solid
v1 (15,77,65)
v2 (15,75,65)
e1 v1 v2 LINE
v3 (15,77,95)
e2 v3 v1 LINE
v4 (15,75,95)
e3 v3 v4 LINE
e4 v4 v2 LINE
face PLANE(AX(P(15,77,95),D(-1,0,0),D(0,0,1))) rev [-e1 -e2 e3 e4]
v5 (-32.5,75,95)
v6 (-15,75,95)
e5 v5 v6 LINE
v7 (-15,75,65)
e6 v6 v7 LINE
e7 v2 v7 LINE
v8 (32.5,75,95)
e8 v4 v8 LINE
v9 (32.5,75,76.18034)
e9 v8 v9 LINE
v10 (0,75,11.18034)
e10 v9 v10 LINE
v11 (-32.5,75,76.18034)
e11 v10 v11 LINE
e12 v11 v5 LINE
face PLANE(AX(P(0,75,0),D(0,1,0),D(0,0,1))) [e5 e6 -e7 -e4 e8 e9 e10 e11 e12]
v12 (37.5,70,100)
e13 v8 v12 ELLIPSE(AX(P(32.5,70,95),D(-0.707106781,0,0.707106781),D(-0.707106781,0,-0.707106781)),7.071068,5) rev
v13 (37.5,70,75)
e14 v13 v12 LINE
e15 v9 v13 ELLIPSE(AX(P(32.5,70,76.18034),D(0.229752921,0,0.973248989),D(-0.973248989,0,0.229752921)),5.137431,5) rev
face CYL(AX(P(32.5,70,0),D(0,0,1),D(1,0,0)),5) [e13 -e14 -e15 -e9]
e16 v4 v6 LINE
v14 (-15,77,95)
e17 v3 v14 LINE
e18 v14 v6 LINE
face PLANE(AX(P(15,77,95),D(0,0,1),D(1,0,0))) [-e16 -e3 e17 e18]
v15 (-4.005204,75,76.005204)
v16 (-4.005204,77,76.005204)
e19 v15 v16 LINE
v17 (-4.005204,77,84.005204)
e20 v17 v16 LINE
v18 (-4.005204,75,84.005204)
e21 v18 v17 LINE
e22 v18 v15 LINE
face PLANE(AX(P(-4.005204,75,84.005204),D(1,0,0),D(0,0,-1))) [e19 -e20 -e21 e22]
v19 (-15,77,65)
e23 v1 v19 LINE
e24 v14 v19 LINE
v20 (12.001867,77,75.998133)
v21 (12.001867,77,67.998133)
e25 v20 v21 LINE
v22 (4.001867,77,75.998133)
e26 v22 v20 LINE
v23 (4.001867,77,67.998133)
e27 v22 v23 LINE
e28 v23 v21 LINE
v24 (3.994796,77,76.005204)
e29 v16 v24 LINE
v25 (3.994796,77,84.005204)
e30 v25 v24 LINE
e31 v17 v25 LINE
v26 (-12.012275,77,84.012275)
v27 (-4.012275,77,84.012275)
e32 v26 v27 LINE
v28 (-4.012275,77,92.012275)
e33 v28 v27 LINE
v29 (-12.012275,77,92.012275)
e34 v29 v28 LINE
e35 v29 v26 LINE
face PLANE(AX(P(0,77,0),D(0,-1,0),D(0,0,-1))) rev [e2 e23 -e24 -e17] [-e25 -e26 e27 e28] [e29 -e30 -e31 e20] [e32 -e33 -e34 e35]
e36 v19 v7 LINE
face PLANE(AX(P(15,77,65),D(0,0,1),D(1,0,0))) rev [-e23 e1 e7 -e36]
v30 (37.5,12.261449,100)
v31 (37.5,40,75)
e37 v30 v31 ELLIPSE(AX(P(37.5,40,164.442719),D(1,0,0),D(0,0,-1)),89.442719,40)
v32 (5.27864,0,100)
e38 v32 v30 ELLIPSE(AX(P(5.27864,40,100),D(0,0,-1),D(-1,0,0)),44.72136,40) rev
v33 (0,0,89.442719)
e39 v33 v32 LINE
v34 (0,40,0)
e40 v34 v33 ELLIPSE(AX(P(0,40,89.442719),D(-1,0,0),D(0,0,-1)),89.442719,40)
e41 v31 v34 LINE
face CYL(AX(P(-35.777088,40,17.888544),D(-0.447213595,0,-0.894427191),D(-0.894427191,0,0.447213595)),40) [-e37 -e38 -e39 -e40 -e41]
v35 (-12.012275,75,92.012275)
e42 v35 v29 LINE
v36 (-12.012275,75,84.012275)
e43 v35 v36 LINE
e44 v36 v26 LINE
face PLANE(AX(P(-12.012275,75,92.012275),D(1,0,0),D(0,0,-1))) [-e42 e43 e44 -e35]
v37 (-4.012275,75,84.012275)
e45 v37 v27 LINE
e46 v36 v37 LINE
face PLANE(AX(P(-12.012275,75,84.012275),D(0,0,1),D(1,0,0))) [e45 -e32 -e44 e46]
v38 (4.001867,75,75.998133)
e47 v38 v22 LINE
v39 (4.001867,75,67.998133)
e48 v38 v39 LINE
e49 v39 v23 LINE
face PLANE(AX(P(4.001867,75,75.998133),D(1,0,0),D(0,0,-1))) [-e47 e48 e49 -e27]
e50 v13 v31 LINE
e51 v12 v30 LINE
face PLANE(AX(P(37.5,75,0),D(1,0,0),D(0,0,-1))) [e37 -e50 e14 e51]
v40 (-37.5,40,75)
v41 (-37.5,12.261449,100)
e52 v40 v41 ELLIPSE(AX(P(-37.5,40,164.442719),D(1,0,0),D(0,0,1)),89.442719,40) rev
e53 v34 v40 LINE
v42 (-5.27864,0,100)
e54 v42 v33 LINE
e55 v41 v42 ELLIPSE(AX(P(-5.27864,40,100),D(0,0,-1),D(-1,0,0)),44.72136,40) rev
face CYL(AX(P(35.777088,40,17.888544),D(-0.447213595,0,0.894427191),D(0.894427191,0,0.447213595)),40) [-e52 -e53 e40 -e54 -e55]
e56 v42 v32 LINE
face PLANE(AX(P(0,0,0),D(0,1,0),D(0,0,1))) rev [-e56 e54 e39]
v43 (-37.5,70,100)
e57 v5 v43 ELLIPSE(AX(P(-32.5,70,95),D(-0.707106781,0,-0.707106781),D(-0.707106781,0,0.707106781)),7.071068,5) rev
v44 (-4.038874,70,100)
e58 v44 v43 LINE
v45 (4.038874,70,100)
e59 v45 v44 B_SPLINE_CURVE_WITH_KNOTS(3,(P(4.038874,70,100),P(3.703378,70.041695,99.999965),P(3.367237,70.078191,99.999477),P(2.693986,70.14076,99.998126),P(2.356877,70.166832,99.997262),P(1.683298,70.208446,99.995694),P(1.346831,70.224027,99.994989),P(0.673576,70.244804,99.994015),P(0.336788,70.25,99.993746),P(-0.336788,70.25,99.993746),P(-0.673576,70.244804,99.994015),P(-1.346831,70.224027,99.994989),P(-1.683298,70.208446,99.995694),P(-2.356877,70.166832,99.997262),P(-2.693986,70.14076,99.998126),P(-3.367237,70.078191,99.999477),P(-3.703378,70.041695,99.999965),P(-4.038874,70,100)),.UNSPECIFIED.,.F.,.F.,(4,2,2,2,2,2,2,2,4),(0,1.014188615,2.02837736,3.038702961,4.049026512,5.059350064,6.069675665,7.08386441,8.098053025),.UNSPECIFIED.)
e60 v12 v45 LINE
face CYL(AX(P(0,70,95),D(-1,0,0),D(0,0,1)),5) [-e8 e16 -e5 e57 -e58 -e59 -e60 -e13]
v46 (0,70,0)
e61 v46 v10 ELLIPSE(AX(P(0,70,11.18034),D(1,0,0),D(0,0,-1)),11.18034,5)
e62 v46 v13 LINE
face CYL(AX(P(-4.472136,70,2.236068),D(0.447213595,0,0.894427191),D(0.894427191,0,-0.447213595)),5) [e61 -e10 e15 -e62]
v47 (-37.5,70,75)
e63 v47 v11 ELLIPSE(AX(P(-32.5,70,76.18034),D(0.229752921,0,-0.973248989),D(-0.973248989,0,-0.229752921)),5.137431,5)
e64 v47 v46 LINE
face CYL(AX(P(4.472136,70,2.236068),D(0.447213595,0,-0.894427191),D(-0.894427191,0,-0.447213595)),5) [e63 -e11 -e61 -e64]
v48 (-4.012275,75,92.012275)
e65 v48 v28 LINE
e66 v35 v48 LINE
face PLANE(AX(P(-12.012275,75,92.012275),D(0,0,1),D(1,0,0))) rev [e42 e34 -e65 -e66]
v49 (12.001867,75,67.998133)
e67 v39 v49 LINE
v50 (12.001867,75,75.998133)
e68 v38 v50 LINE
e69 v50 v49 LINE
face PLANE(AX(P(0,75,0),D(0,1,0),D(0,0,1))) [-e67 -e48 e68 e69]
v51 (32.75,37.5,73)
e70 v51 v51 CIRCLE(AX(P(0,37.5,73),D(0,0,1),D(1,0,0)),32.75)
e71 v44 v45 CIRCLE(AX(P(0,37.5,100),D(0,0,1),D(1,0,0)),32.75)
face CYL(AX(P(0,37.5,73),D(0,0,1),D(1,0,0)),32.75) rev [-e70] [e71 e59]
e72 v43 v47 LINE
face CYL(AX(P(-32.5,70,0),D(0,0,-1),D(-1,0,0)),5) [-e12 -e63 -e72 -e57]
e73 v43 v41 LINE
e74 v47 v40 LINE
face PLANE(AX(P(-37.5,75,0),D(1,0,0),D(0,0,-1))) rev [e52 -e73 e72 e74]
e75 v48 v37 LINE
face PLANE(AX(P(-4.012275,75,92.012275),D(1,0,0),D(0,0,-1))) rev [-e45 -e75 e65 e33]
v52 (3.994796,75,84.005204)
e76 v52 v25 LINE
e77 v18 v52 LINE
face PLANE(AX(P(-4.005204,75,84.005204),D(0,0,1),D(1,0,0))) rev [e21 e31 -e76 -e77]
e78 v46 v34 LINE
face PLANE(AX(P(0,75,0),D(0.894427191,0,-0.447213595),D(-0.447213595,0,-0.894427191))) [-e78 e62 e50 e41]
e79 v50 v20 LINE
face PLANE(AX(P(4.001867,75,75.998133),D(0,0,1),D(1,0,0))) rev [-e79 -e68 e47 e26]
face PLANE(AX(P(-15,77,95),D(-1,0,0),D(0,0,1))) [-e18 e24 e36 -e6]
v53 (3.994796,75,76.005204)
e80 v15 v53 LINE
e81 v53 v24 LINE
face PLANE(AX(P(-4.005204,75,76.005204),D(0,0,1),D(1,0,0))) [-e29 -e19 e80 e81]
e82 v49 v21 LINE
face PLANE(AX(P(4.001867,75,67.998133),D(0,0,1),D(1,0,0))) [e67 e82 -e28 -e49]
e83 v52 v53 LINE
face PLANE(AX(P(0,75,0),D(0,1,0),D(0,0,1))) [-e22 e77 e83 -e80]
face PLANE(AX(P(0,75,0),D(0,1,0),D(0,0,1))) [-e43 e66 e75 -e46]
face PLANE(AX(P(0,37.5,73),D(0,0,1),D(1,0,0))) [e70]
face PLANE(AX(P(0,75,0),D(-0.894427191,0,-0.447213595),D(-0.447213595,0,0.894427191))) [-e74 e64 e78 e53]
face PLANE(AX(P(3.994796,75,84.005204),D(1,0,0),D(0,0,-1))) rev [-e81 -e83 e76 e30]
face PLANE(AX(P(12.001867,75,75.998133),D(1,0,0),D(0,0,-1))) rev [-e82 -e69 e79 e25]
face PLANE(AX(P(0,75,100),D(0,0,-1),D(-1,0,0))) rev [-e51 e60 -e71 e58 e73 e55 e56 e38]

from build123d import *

# Parameters (mm, degrees)
CROQUIS1_W              = 37.5
CROQUIS1_H              = 25
SALIENTE_EXTRUIR1_DEPTH = 75
CROQUIS3_R              = 32.75
CORTAR_EXTRUIR2_DEPTH   = 27
REDONDEO4_R             = 40
REDONDEO5_R             = 5
CROQUIS4_W              = 30
CROQUIS4_H              = 30
SALIENTE_EXTRUIR2_DEPTH = 2
CROQUIS5_W              = 8
CROQUIS5_H              = 8
CORTAR_EXTRUIR10_DEPTH  = 2


with BuildPart() as part:
    # Croquis1 → Saliente-Extruir1 (new body)
    with BuildSketch(Plane(origin=(0, 0, 0), x_dir=(1, 0, 0), z_dir=(0, 1, 0))):
        Polygon((0, 0), (-37.5, -75), (0, -75), align=None)
        Polygon((37.5, -75), (0, 0), (0, -75), align=None)
        with Locations((18.75, -87.5)):
            Rectangle(CROQUIS1_W, CROQUIS1_H)
        with Locations((-18.75, -87.5)):
            Rectangle(CROQUIS1_W, CROQUIS1_H)
    extrude(amount=SALIENTE_EXTRUIR1_DEPTH)

    # Croquis3 → Cortar-Extruir2 (cut)
    with BuildSketch(Plane.XY.offset(100)):
        with Locations((0, 37.5)):
            Circle(CROQUIS3_R)
    extrude(amount=-CORTAR_EXTRUIR2_DEPTH, mode=Mode.SUBTRACT)

    # Redondeo4
    redondeo4_edges = [part.edges().sort_by_distance(p)[0] for p in [
        (-18.75, 0, 37.5),
        (18.75, 0, 37.5),
    ]]
    fillet(redondeo4_edges, radius=REDONDEO4_R)

    # Redondeo5
    # the kernel refuses this fillet: 5 mm, written as the material it takes off along each edge
    with BuildSketch(Plane(origin=(37.5, 75, 112.5), x_dir=(-1, 0, 0), z_dir=(0, 0, -1)), Plane(origin=(-37.5, 75, 62.5), x_dir=(1, 0, 0), z_dir=(0, 0, 1))) as redondeo5_piece_1:
        with BuildLine():
            CenterArc((REDONDEO5_R, -REDONDEO5_R), REDONDEO5_R, 90, 90)
            Line((0, -REDONDEO5_R), (0, 0))
            Line((0, 0), (REDONDEO5_R, 0))
        make_face()
    extrude(amount=50, mode=Mode.SUBTRACT)
    with BuildSketch(Plane(origin=(43.090169944, 75, 86.180339887), x_dir=(0, -1, 0), z_dir=(-0.4472135954999581, 0, -0.8944271909999159)), Plane(origin=(5.590169944, 75, -11.180339887), x_dir=(0, -1, 0), z_dir=(-0.44721359549995776, 0, 0.894427190999916))) as redondeo5_piece_2:
        with BuildLine():
            CenterArc((REDONDEO5_R, REDONDEO5_R), REDONDEO5_R, 180, 90)
            Line((0, REDONDEO5_R), (0, 0))
            Line((0, 0), (REDONDEO5_R, 0))
        make_face()
    extrude(amount=108.852549156, mode=Mode.SUBTRACT)
    with BuildSketch(Plane(origin=(-50, 75, 100), x_dir=(0, 0, -1), z_dir=(1, 0, 0))) as redondeo5_piece_3:
        with BuildLine():
            CenterArc((REDONDEO5_R, -REDONDEO5_R), REDONDEO5_R, 90, 90)
            Line((0, -REDONDEO5_R), (0, 0))
            Line((0, 0), (REDONDEO5_R, 0))
        make_face()
    extrude(amount=100, mode=Mode.SUBTRACT)

    # Croquis4 → Saliente-Extruir2 (add)
    with BuildSketch(Plane(origin=(0, 75, 0), x_dir=(1, 0, 0), z_dir=(0, 1, 0))):
        with Locations((0, -80)):
            Rectangle(CROQUIS4_W, CROQUIS4_H)
    extrude(amount=SALIENTE_EXTRUIR2_DEPTH)

    # Croquis5 → Cortar-Extruir10 (cut)
    with BuildSketch(Plane(origin=(0, 77, 0), x_dir=(1, 0, 0), z_dir=(0, 1, 0))):
        with Locations((-8.012274888, -88.012274888)):
            Rectangle(CROQUIS5_W, CROQUIS5_H)
        with Locations((8.001867248, -71.998132752)):
            Rectangle(CROQUIS5_W, CROQUIS5_H)
        with Locations((-0.00520382, -80.00520382)):
            Rectangle(CROQUIS5_W, CROQUIS5_H)
    extrude(amount=-CORTAR_EXTRUIR10_DEPTH, mode=Mode.SUBTRACT)


solid = part.part
